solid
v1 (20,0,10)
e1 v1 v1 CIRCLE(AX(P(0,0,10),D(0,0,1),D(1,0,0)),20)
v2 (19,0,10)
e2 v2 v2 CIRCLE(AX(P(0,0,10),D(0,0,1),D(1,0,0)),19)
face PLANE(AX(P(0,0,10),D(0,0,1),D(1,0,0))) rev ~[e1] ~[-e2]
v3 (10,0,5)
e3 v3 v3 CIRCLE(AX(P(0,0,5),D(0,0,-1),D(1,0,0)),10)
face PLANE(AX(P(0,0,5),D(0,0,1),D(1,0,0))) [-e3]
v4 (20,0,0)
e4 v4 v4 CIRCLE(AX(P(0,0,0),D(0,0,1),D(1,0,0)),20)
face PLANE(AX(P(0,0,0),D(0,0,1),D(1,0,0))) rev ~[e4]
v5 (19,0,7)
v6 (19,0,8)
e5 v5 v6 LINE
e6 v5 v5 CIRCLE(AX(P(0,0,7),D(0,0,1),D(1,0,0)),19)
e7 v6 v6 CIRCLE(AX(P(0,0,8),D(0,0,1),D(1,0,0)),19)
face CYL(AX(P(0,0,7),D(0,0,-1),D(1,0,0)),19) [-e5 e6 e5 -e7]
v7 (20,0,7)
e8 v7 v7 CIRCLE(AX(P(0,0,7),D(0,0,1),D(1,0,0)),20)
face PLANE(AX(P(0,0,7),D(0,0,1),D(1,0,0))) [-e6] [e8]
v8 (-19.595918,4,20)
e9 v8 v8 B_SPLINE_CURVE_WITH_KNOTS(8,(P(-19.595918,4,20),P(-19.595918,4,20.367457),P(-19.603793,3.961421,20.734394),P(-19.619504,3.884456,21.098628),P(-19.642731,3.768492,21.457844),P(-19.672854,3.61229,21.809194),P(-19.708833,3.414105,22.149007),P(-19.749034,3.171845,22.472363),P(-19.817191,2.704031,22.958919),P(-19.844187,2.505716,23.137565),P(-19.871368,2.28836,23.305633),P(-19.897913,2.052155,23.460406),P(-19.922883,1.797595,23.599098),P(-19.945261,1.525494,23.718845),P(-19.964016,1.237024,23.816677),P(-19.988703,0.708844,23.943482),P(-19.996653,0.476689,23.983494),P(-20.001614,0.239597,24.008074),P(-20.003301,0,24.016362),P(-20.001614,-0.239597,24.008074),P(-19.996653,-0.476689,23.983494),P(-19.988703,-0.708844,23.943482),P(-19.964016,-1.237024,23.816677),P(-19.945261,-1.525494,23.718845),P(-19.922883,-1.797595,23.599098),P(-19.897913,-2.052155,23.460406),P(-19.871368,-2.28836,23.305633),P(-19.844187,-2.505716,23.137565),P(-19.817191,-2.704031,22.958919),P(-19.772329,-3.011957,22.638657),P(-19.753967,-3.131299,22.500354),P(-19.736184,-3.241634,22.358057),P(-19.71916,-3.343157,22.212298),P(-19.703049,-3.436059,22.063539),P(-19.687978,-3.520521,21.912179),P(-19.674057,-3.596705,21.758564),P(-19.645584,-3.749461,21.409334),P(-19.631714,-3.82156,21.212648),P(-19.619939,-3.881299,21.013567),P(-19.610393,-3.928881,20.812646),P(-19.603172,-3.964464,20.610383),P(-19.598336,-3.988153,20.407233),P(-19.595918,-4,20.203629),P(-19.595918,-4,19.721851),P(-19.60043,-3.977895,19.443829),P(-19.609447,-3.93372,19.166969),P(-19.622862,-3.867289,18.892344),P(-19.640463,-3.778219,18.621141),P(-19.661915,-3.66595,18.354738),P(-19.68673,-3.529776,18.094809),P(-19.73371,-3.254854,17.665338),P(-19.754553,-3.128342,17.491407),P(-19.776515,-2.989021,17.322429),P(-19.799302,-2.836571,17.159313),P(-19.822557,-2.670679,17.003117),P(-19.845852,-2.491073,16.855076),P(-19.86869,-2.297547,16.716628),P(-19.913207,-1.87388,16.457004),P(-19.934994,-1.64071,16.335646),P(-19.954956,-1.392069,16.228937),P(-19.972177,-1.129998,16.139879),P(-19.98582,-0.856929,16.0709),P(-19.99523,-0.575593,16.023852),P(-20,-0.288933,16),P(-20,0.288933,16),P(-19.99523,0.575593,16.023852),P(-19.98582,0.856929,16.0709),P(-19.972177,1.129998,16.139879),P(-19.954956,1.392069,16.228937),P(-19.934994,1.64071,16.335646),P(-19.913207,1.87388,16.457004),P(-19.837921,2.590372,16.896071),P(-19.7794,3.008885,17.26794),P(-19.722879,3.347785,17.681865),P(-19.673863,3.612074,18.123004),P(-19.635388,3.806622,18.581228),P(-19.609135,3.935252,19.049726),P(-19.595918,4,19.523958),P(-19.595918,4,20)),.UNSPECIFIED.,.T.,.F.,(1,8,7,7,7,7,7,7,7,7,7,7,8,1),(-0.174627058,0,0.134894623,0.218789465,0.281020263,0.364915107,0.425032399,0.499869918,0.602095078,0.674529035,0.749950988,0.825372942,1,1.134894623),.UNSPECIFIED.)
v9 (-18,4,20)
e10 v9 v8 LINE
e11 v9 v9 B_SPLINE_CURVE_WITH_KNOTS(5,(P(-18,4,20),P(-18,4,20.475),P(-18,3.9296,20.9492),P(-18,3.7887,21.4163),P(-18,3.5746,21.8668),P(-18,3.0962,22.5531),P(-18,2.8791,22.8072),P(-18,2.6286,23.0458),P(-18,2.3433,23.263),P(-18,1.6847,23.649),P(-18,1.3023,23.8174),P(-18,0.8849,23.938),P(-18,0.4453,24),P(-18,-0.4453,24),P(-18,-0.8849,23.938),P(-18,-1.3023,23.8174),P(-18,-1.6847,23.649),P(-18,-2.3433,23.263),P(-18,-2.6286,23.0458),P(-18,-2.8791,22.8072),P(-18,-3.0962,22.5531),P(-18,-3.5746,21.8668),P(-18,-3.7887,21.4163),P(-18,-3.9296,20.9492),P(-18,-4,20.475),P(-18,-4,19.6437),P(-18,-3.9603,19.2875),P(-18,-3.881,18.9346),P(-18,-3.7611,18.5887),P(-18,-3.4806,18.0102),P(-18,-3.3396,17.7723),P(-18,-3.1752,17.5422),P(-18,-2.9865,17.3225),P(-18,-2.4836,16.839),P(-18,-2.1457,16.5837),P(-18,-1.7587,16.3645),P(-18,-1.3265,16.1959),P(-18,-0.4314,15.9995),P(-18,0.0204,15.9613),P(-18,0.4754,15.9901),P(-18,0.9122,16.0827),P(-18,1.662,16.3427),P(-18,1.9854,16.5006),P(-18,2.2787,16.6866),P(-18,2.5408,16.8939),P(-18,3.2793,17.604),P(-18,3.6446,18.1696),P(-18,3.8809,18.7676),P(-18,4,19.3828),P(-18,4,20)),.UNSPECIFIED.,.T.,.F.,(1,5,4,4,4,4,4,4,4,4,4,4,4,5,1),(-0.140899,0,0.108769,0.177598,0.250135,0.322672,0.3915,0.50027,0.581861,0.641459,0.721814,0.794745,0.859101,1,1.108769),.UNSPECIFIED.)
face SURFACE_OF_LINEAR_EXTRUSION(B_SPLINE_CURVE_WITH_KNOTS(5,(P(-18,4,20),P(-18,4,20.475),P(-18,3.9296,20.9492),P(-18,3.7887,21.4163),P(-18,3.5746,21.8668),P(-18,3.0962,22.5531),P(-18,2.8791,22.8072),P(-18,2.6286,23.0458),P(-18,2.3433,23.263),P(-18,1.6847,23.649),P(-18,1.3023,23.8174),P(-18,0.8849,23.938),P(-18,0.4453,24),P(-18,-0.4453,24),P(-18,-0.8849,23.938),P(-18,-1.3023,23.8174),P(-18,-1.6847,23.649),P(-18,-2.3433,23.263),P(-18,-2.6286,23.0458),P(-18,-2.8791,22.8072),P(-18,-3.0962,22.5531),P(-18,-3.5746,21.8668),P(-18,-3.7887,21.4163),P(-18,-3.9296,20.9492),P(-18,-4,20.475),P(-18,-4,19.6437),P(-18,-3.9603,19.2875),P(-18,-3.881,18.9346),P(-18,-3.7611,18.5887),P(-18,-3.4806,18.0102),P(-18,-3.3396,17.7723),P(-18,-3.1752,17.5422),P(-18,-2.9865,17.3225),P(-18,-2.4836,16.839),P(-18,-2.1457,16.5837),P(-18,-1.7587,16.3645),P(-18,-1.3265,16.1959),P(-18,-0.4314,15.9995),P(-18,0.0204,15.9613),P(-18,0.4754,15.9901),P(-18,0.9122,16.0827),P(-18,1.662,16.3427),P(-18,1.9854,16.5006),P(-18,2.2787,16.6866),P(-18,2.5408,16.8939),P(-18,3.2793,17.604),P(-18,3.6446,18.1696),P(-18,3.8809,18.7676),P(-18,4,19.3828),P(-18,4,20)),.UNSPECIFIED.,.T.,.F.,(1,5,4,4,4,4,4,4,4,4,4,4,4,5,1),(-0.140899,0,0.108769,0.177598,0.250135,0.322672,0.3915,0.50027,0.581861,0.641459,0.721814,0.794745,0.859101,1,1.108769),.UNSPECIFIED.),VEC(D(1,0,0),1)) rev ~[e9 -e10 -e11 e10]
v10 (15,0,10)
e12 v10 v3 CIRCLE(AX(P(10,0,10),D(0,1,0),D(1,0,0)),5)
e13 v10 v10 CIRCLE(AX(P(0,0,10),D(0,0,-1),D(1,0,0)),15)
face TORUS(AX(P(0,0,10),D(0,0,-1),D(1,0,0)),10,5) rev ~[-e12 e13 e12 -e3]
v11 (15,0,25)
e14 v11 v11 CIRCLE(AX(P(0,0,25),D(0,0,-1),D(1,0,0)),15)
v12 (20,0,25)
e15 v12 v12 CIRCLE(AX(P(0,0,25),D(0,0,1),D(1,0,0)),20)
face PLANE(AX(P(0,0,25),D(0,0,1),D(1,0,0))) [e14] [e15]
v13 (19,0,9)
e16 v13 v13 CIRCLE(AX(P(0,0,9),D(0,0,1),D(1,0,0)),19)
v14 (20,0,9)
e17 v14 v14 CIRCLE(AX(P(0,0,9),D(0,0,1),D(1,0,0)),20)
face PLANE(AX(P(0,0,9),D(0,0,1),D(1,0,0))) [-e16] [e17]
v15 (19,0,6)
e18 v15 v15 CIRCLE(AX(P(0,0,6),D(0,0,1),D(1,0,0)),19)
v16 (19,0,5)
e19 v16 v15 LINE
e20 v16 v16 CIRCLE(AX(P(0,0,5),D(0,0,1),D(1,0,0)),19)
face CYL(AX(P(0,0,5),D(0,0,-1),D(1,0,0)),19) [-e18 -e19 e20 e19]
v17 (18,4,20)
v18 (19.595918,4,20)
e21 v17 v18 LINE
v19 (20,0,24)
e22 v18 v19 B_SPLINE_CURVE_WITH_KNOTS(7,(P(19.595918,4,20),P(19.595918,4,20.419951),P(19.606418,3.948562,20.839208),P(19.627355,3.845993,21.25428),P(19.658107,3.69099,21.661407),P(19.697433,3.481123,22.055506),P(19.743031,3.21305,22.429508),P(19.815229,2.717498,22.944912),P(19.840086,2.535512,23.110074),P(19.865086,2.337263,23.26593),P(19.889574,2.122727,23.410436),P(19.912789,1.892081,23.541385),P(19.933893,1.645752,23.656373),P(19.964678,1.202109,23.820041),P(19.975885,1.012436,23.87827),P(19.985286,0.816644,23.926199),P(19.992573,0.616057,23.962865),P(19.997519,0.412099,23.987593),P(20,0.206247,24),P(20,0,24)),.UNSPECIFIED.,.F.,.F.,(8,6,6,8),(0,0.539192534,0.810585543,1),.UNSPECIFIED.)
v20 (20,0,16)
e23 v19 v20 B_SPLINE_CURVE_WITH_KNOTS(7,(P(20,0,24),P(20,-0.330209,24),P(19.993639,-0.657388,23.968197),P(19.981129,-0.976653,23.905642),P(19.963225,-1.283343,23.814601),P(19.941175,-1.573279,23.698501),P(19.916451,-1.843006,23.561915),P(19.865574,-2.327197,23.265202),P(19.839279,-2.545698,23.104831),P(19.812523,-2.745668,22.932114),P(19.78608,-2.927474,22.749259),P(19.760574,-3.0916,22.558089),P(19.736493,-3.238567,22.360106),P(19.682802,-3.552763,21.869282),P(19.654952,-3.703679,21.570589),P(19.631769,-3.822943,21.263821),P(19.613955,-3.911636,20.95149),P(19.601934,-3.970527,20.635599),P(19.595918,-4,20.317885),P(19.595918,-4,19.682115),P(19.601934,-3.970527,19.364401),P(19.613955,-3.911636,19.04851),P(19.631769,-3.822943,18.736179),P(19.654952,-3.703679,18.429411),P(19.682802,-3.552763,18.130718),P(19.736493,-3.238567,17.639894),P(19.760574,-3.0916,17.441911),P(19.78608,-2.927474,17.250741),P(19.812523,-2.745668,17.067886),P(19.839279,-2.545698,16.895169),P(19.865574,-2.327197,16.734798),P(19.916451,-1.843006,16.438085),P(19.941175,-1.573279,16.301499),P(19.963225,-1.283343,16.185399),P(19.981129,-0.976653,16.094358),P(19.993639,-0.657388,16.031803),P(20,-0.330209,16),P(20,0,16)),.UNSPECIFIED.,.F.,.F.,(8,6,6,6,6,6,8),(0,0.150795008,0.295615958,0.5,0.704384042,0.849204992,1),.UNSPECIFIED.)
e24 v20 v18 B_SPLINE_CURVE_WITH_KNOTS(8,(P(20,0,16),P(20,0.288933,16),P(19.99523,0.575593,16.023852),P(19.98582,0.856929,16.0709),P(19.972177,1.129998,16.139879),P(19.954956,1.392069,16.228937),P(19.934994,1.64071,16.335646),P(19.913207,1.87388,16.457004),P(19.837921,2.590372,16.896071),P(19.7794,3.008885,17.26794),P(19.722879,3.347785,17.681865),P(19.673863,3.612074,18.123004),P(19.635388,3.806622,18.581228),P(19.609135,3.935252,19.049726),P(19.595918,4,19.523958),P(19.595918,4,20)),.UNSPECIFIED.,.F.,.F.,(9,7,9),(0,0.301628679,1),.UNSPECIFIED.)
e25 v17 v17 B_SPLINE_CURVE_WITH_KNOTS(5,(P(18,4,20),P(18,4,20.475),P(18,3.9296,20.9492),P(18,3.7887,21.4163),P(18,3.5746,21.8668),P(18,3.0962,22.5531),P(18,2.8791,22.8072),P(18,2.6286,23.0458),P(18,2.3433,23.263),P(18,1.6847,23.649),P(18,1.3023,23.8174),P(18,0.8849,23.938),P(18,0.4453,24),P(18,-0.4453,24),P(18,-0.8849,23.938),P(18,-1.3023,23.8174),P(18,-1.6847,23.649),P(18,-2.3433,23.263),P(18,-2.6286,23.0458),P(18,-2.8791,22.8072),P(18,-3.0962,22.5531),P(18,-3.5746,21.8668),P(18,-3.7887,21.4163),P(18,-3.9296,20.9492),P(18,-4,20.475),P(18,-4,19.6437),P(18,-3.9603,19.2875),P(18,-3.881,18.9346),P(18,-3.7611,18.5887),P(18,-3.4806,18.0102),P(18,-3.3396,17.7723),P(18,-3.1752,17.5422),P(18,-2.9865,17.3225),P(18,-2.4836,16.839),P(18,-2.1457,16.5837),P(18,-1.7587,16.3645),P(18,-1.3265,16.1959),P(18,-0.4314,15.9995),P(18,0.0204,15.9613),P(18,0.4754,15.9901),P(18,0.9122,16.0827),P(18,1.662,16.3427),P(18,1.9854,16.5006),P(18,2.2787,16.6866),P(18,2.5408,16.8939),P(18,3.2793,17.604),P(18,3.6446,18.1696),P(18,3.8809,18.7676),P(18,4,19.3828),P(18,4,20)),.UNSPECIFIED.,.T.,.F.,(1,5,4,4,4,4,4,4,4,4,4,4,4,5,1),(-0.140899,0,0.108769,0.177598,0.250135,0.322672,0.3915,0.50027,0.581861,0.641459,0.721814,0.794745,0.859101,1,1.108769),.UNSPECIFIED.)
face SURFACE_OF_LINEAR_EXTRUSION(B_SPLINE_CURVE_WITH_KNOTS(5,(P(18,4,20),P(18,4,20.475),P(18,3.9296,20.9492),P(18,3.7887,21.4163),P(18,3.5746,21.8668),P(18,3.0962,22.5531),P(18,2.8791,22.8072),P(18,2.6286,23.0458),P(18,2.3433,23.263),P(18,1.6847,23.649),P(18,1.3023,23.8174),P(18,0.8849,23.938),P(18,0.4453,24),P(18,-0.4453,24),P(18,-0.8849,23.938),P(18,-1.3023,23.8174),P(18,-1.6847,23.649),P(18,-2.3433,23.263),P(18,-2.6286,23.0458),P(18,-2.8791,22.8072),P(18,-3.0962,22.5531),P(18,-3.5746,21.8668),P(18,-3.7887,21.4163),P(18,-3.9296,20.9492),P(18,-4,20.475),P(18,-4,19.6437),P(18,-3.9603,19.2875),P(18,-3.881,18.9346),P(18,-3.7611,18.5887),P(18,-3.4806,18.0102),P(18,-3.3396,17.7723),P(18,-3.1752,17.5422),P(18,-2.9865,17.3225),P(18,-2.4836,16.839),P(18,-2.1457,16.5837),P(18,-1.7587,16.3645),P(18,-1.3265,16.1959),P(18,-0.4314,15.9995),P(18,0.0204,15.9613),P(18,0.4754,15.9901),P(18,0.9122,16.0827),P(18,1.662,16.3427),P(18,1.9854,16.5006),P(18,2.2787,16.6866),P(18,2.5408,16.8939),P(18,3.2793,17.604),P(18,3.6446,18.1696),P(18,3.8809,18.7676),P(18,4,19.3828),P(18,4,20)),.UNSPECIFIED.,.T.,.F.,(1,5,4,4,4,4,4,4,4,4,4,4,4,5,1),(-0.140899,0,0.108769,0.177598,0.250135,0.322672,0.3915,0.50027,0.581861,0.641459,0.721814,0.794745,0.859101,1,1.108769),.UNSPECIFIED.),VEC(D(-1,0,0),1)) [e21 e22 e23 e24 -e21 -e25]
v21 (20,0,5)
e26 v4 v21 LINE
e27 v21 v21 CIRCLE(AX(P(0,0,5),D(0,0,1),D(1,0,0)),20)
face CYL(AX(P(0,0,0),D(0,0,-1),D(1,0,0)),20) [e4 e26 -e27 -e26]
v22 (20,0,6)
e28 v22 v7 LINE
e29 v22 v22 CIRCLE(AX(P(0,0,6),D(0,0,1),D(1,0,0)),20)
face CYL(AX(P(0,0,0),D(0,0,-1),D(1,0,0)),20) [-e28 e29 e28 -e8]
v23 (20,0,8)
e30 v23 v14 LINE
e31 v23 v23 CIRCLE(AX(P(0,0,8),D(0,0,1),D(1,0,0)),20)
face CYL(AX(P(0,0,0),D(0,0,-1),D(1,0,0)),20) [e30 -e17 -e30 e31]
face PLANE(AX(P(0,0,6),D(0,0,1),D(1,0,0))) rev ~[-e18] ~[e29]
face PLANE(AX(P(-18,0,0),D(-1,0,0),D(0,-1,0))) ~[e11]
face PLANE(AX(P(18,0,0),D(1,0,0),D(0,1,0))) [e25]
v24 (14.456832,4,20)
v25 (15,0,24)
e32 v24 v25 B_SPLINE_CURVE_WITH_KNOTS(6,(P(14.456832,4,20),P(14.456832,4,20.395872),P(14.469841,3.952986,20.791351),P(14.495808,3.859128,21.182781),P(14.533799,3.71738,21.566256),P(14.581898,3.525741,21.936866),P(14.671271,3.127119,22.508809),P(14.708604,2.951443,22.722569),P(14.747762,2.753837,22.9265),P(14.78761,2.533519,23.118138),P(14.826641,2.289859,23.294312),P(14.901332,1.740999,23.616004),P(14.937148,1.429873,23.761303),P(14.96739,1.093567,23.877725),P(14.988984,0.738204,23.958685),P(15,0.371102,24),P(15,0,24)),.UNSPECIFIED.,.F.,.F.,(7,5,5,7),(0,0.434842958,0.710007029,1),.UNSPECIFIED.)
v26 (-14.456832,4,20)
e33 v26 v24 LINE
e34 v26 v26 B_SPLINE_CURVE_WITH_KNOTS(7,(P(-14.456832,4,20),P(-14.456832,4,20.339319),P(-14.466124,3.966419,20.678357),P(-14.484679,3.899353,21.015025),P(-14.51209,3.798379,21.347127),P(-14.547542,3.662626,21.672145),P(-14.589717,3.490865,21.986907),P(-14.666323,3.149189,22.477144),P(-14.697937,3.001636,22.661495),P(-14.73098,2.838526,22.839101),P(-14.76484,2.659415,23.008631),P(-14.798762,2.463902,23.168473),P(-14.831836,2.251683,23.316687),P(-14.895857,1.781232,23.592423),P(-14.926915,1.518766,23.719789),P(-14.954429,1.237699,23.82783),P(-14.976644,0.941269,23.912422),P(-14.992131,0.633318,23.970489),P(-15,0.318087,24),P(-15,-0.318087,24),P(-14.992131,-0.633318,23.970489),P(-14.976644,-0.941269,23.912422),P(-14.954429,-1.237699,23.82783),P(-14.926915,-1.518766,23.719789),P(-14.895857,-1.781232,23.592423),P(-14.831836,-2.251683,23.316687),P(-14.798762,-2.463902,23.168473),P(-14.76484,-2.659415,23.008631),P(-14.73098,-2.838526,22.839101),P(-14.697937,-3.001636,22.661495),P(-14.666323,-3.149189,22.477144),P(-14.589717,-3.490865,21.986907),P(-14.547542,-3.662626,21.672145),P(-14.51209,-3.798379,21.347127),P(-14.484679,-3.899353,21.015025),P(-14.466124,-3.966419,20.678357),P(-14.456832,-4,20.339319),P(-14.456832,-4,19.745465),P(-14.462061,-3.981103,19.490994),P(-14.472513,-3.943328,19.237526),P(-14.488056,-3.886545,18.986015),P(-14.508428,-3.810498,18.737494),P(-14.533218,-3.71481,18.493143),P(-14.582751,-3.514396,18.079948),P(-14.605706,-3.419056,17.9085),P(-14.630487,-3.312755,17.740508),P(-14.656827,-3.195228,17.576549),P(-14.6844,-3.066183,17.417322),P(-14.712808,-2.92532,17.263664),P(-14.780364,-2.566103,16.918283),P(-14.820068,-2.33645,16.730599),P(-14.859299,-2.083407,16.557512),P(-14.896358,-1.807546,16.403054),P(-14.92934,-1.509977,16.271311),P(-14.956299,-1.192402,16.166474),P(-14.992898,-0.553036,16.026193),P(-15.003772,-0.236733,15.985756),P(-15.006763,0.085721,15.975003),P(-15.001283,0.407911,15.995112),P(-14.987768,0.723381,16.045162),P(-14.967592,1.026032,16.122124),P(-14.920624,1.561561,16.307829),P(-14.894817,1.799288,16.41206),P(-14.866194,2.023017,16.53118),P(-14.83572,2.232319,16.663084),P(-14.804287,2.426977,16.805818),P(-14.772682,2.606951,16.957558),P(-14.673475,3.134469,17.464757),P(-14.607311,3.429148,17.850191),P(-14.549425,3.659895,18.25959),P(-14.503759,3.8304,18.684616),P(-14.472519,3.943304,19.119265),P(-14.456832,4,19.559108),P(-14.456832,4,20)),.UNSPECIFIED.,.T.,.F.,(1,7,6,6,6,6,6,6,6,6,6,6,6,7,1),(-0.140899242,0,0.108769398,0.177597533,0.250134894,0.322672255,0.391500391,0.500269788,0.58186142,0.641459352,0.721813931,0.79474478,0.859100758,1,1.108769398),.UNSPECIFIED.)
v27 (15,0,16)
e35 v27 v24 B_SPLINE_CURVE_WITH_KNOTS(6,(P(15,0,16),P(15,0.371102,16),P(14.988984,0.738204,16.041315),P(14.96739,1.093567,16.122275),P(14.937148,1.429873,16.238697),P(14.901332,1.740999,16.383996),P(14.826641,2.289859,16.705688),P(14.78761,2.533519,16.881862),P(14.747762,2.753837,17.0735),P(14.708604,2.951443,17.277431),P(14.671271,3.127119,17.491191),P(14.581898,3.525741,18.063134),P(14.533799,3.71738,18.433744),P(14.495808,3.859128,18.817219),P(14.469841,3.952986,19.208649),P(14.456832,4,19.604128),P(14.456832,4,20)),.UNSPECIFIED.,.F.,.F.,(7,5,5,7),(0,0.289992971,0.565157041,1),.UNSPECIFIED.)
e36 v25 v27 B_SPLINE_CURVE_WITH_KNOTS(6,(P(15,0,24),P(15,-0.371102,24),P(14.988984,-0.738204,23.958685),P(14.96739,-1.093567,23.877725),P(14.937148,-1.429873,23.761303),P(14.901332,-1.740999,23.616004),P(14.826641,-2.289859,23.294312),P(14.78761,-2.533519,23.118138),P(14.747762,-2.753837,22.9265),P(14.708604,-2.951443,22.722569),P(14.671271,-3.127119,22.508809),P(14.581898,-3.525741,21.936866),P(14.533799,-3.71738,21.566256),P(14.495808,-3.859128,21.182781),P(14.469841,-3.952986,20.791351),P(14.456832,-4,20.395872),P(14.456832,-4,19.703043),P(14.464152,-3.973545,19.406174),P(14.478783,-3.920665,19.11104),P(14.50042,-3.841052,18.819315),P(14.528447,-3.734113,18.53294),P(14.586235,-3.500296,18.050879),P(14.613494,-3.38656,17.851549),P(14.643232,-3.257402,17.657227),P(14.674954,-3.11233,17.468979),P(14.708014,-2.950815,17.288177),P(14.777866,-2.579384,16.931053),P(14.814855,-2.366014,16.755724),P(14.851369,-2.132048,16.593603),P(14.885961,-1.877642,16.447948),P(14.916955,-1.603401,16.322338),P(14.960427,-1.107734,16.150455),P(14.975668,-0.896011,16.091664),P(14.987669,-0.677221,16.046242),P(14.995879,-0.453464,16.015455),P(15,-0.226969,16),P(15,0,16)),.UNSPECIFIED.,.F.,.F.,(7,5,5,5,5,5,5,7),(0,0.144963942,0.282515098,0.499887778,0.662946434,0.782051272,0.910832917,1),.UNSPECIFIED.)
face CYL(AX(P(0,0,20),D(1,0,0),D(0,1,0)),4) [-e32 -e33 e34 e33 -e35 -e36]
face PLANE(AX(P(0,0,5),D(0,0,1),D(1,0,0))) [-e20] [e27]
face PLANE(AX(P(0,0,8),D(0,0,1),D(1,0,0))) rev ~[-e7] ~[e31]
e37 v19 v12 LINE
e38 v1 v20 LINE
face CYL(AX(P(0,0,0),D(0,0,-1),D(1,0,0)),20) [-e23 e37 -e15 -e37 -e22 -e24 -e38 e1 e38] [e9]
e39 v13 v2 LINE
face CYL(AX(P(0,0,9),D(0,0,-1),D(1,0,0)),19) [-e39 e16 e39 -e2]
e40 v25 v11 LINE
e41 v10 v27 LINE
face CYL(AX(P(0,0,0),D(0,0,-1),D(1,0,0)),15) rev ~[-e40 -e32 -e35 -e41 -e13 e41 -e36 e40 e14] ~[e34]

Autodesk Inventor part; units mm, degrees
ref_plane "XZ Plane" through (0, 0, 0) normal (0, 1, 0) x (-1, 0, 0)
sketch "Sketch1" plane through (0, 0, 0) normal (0, 0, 1) x (1, 0, 0)
  circle A0 centre (0, 0) radius 20
  dimension "d0" = 40
extrude "Extrusion1" add sketch "Sketch1" along normal blind 25
shell "Shell1" thickness 5 removed faces 1 at (-2.364, 6.2334, 25)
fillet "Fillet1" radius 5 1 edges at (-15, 0, 5)
sketch "Sketch2" plane through (0, 0, 0) normal (1, 0, 0) x (0, 1, 0)
  line L0 (-28, 0) -> (28, 0) projected
  line L1 (0, -5) -> (0, 30) projected
  circle A0 centre (0, 20) radius 4
  line L2 (20, 25) -> (-20, 25) projected
  point P0 (0, 0)
  dimension "d5" = 8
  dimension "d6" = 5
extrude "Extrusion2" add sketch "Sketch2" along normal through all both and the other way through all
ref_plane "Work Plane1" through (18, 0, 0) normal (1, 0, 0) x (0, 1, 0)
sketch "Sketch3" plane through (18, 0, 0) normal (1, 0, 0) x (0, 1, 0)
  spline S0 degree 5 poles (4, 20) (4, 20.475) (3.9296, 20.9492) (3.7887, 21.4163) (3.5746, 21.8668) (3.0962, 22.5531) (2.8791, 22.8072) (2.6286, 23.0458) (2.3433, 23.263) (1.6847, 23.649) (1.3023, 23.8174) (0.8849, 23.938) (0.4453, 24) (-0.4453, 24) (-0.8849, 23.938) (-1.3023, 23.8174) (-1.6847, 23.649) (-2.3433, 23.263) (-2.6286, 23.0458) (-2.8791, 22.8072) (-3.0962, 22.5531) (-3.5746, 21.8668) (-3.7887, 21.4163) (-3.9296, 20.9492) (-4, 20.475) (-4, 19.6437) (-3.9603, 19.2875) (-3.881, 18.9346) (-3.7611, 18.5887) (-3.4806, 18.0102) (-3.3396, 17.7723) (-3.1752, 17.5422) (-2.9865, 17.3225) (-2.4836, 16.839) (-2.1457, 16.5837) (-1.7587, 16.3645) (-1.3265, 16.1959) (-0.4314, 15.9995) (0.0204, 15.9613) (0.4754, 15.9901) (0.9122, 16.0827) (1.662, 16.3427) (1.9854, 16.5006) (2.2787, 16.6866) (2.5408, 16.8939) (3.2793, 17.604) (3.6446, 18.1696) (3.8809, 18.7676) (4, 19.3828) (4, 20) knots 0 0 0 0 0 0 0.108769 0.108769 0.108769 0.108769 0.177598 0.177598 0.177598 0.177598 0.250135 0.250135 0.250135 0.250135 0.322672 0.322672 0.322672 0.322672 0.3915 0.3915 0.3915 0.3915 0.50027 0.50027 0.50027 0.50027 0.581861 0.581861 0.581861 0.581861 0.641459 0.641459 0.641459 0.641459 0.721814 0.721814 0.721814 0.721814 0.794745 0.794745 0.794745 0.794745 0.859101 0.859101 0.859101 0.859101 1 1 1 1 1 1 projected
  point P0 (0, 0)
  dimension "d10" = 0
extrude "Extrusion3" cut sketch "Sketch3" along normal through all
mirror "Mirror1" about plane through (0, 0, 0) normal (1, 0, 0) of "Extrusion3"
ref_plane "Work Plane2" through (0, 0, 5) normal (0, 0, 1) x (1, 0, 0)
sketch "Sketch4" plane through (0, 0, 5) normal (0, 0, 1) x (1, 0, 0)
  circle A0 centre (0, 0) radius 15 projected
  circle A1 centre (0, 0) radius 20 projected
  circle A2 centre (0, 0) radius 19
  dimension "d14" = 1
extrude "Extrusion4" cut sketch "Sketch4" along normal blind 1 contours A1
pattern_linear "Rectangular Pattern1" count 3 spacing 2 along (0, 0, 1) of "Extrusion4"
properties part number "Piston" material "Steel, Carbon"
